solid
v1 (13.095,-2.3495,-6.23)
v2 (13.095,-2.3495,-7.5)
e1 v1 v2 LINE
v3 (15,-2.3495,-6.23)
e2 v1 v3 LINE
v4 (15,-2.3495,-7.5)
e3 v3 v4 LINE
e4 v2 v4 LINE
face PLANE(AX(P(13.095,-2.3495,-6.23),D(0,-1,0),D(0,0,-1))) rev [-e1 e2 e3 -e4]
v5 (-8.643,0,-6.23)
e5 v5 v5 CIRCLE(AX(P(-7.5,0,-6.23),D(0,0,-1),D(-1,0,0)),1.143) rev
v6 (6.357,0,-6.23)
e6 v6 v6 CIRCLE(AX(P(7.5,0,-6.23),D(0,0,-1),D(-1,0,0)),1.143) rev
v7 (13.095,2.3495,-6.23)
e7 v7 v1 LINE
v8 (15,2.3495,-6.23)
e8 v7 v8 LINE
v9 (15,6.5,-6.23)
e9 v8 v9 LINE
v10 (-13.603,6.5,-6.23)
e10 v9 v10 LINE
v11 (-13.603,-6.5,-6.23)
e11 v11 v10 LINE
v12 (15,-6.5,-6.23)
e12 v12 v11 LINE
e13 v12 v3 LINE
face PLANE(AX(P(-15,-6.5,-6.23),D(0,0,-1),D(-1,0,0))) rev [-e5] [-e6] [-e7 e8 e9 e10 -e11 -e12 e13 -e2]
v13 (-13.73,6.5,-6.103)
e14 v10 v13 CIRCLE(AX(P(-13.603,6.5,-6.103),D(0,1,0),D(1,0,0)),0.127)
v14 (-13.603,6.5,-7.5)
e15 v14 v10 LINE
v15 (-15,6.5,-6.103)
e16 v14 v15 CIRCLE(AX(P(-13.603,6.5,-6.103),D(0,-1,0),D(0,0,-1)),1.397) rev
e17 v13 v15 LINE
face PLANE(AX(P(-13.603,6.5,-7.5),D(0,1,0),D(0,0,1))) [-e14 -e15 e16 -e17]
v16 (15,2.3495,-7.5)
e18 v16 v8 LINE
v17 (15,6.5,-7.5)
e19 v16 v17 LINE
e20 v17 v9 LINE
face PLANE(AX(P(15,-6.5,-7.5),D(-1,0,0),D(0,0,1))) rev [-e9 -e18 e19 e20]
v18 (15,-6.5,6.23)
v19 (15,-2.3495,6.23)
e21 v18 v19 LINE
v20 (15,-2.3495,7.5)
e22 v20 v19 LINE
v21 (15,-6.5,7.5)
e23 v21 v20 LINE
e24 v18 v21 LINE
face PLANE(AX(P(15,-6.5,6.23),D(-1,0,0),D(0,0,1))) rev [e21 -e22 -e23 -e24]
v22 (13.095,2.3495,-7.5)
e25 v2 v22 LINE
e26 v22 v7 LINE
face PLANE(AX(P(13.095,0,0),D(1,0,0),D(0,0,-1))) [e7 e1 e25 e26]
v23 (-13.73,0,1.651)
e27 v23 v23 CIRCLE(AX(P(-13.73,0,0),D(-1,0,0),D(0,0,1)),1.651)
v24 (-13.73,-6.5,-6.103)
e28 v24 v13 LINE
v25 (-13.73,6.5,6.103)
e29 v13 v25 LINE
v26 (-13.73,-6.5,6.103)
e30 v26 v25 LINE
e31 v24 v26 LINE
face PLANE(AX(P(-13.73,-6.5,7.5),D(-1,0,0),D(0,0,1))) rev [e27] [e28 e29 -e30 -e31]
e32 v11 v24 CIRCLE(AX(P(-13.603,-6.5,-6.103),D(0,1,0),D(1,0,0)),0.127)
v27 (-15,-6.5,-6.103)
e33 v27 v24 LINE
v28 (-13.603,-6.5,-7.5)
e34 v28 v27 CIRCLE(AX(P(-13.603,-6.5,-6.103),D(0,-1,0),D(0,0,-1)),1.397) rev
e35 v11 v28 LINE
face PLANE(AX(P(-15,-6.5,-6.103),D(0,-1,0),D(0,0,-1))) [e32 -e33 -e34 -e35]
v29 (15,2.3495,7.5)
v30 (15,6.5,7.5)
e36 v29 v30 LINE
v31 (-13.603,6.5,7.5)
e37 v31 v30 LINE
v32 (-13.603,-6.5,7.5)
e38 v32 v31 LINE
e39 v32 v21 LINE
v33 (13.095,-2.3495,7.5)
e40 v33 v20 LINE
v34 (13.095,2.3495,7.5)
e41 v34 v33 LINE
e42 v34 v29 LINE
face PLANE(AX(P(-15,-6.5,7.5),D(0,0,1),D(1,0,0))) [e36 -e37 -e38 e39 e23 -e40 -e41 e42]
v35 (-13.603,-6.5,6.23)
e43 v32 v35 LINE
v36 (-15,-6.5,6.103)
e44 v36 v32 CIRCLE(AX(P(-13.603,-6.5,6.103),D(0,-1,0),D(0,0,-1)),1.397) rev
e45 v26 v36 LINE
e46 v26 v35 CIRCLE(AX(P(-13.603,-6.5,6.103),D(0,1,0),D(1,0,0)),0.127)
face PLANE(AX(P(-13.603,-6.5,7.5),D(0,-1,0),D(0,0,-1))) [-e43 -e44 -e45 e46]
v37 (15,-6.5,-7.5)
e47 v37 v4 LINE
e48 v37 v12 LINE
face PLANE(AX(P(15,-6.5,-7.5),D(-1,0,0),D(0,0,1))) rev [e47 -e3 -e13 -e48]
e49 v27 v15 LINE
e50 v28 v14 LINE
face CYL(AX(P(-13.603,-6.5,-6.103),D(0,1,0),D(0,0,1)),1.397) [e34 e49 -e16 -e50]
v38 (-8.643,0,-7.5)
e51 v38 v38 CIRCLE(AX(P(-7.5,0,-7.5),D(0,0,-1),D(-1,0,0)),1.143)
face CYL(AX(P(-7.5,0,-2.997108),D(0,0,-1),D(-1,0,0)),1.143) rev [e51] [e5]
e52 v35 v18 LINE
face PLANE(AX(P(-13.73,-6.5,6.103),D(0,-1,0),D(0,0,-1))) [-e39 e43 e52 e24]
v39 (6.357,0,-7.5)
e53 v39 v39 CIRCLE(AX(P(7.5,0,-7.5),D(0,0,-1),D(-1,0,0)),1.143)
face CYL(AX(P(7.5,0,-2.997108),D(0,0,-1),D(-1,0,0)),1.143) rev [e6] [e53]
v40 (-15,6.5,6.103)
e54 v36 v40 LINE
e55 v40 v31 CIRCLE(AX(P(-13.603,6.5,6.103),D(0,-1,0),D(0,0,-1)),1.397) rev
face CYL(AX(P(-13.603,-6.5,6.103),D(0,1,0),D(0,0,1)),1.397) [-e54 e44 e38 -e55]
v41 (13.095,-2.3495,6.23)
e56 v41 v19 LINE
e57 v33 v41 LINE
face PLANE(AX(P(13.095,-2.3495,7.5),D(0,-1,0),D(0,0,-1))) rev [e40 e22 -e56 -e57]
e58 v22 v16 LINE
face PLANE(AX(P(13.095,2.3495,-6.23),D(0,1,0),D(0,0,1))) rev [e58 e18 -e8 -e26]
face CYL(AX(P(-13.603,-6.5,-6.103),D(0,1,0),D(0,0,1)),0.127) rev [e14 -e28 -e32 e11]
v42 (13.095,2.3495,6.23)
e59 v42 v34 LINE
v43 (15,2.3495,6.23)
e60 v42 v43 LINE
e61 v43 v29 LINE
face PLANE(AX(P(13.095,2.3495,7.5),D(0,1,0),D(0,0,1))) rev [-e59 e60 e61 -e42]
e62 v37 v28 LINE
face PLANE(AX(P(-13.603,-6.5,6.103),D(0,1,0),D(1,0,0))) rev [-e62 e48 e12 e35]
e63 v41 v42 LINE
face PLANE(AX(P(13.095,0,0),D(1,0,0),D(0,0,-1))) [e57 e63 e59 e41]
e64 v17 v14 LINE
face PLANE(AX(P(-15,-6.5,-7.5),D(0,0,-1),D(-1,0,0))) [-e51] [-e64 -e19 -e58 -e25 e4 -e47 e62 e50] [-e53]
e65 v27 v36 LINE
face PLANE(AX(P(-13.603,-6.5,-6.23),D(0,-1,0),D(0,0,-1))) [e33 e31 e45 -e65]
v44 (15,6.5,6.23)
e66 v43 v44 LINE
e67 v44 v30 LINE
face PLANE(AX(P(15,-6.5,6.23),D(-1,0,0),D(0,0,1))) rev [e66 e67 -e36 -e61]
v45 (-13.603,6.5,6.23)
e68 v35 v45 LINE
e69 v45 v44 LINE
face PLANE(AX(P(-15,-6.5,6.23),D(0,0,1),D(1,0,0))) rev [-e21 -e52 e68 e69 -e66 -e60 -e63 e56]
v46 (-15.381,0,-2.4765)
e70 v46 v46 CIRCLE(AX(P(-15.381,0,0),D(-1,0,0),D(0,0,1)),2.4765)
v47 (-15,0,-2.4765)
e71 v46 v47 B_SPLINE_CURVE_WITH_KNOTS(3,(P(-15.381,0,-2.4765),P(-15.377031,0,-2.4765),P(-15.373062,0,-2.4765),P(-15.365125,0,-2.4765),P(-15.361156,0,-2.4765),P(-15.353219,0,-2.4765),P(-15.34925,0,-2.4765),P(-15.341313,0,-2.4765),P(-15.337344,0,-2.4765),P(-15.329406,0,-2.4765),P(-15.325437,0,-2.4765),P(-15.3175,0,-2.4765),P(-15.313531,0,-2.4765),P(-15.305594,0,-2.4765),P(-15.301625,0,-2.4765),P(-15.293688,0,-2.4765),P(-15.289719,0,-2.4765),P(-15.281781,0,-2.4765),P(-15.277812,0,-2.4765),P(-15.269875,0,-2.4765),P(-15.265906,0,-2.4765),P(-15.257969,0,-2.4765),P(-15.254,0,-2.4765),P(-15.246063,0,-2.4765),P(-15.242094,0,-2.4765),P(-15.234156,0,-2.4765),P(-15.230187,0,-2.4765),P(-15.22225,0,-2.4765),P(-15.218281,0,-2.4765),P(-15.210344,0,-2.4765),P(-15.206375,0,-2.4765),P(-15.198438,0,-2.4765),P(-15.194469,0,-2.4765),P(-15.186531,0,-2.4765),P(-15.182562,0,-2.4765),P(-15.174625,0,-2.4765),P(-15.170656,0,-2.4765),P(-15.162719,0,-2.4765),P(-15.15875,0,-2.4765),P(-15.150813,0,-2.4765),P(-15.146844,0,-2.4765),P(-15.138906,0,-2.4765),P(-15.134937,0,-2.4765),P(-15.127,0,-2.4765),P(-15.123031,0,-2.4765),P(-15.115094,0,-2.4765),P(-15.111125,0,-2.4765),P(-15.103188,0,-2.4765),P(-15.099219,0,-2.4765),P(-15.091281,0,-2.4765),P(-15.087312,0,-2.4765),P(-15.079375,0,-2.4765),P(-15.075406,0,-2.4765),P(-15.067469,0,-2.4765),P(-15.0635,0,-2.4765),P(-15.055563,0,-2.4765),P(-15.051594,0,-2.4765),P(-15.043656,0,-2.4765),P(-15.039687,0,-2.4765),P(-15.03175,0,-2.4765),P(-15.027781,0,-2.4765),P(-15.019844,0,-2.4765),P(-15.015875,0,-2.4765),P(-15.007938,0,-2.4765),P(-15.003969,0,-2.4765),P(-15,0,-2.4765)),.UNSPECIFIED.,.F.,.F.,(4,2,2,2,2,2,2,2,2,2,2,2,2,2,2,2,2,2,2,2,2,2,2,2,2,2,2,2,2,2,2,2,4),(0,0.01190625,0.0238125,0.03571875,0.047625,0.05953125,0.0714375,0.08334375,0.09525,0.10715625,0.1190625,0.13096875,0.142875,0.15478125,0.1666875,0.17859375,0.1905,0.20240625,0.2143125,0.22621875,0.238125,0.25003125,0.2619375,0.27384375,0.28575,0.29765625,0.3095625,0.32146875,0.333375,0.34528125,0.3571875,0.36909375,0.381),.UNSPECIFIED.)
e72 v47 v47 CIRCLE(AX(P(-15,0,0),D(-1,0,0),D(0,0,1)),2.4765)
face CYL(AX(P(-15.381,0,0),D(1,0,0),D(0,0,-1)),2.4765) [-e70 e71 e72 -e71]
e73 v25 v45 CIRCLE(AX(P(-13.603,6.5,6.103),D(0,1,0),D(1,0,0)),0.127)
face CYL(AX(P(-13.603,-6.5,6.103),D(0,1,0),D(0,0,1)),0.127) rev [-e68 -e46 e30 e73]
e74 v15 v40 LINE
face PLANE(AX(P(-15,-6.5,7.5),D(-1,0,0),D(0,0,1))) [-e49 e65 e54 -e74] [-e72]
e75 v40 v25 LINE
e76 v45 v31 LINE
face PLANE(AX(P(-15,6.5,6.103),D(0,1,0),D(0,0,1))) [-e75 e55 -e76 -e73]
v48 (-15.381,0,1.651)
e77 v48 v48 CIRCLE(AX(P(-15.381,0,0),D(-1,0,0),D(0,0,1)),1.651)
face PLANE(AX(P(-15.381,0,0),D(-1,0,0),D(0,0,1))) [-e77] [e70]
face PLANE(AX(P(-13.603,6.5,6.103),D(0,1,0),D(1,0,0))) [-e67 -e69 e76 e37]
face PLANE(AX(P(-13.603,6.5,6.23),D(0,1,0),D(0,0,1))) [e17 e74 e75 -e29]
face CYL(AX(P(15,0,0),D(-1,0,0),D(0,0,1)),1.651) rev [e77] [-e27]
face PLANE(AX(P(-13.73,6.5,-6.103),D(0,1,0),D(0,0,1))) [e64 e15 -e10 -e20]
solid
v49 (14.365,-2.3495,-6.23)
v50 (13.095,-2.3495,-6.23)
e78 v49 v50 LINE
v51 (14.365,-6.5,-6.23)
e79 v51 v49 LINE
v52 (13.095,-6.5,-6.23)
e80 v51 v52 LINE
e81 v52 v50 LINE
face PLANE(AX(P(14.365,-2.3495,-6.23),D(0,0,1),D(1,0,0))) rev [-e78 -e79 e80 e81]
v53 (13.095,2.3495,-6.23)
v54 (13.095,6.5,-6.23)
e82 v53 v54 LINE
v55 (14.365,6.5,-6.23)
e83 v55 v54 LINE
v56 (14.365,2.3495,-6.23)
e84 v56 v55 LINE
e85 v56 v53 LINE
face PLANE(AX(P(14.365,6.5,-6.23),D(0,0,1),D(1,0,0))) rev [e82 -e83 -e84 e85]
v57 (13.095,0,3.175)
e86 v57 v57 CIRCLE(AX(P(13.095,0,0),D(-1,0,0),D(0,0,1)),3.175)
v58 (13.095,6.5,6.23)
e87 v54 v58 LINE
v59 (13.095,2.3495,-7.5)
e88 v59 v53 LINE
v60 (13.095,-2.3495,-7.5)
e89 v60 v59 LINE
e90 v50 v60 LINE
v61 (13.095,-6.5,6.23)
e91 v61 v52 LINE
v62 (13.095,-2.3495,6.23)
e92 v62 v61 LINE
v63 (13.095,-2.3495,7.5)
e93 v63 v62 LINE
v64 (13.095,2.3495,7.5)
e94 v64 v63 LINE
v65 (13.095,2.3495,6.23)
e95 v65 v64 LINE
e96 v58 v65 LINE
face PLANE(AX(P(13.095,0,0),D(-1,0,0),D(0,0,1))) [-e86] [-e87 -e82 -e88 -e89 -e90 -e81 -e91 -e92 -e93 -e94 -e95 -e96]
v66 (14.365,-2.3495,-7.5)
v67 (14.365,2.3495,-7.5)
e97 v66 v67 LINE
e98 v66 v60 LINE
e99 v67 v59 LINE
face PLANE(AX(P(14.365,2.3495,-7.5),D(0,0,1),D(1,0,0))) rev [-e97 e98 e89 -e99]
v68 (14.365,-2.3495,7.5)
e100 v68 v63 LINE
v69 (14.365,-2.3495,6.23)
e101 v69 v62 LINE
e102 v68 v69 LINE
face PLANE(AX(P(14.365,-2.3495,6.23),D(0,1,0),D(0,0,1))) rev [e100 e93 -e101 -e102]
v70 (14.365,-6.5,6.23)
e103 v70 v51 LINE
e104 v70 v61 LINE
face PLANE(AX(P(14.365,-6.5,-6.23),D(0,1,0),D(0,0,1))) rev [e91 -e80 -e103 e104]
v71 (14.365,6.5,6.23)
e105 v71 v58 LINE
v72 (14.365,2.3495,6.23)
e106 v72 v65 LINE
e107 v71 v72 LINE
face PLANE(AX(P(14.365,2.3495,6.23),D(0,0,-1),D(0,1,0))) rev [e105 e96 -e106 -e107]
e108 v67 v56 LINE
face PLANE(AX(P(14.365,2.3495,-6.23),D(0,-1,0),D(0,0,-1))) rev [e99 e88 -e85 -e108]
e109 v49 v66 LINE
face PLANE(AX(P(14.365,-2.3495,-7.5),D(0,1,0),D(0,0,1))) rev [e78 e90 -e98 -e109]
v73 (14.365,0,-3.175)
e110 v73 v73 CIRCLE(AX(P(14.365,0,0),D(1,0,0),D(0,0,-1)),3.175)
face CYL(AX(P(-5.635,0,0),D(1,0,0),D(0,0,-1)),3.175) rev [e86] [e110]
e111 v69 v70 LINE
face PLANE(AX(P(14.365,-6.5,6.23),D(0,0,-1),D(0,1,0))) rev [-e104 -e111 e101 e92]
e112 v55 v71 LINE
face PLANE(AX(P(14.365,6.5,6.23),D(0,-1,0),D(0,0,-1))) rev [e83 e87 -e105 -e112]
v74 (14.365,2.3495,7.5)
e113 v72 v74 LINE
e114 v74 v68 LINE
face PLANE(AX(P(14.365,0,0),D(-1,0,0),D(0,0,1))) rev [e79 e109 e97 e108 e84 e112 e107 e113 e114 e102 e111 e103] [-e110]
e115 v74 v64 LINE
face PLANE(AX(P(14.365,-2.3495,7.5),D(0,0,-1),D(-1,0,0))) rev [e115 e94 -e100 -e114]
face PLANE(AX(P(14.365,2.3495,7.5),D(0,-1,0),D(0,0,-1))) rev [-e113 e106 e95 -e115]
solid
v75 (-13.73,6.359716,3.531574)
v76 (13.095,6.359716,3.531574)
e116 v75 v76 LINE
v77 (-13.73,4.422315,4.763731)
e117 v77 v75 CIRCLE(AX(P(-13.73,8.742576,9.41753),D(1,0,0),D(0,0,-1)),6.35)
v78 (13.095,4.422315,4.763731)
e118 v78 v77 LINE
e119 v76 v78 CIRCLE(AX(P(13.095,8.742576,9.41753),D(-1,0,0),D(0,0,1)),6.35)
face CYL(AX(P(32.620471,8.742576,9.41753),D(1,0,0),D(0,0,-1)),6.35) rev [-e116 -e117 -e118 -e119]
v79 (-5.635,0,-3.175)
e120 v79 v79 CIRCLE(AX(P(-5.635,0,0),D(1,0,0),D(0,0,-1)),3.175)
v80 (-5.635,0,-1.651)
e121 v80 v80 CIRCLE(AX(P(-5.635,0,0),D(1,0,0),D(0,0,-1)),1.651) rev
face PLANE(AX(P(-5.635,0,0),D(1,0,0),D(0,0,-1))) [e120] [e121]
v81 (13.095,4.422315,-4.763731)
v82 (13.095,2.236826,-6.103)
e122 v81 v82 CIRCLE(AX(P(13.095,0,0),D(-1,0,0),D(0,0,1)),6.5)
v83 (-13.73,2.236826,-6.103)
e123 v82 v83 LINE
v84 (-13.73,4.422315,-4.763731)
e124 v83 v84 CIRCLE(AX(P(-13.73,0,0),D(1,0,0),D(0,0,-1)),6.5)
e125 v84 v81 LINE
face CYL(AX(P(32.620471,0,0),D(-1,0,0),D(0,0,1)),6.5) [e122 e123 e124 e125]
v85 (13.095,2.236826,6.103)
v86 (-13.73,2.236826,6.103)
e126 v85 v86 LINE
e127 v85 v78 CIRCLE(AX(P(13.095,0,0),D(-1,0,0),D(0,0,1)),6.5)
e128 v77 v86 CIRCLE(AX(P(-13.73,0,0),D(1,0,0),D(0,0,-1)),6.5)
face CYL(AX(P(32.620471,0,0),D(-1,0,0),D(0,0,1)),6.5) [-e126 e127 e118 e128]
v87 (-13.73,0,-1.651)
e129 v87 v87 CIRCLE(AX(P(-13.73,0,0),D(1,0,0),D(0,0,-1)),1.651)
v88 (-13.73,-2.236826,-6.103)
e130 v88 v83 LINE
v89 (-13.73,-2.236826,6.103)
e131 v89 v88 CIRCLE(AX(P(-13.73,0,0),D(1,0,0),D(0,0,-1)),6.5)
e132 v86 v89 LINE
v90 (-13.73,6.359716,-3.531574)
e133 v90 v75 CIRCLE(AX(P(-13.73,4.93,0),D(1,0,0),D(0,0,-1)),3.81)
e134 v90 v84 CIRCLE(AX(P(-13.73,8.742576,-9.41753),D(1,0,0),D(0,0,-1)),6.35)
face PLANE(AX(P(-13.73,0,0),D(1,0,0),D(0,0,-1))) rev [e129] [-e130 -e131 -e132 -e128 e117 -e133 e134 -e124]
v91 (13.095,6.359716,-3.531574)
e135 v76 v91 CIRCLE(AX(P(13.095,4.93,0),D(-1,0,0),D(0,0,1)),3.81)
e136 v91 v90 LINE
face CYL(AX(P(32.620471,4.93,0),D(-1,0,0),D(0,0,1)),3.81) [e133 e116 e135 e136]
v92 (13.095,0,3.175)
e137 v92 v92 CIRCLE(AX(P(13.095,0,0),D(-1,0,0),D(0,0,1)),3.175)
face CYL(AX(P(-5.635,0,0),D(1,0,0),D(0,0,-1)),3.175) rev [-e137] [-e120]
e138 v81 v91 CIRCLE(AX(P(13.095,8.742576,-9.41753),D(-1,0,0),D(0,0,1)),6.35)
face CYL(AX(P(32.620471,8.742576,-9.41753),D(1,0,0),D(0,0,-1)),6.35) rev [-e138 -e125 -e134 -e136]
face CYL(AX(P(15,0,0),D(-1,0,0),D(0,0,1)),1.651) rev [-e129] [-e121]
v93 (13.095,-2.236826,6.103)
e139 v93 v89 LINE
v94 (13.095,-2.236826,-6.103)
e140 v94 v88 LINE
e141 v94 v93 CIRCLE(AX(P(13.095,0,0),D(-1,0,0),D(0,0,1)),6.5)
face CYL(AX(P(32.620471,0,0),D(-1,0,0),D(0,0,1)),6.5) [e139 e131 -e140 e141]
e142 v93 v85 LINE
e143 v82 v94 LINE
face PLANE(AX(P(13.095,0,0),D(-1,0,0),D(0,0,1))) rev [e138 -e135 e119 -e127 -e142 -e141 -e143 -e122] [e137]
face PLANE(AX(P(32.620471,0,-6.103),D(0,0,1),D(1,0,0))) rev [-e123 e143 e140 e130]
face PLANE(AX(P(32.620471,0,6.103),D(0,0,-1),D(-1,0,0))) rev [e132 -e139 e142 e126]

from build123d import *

# Parameters (mm, degrees)
T_LE_DE_BASE_PLI_E1_DEPTH = 6.5
ESQUISSE6_W               = 1.27
ESQUISSE6_H               = 4.699
ENL_V_MAT_EXTRU_1_DEPTH   = 1.905
BOSS_EXTRU_1_DEPTH        = 1.27
BOSS_EXTRU_2_DEPTH        = 26.825
CONG_1_R                  = 6.35
ESQUISSE13_R              = 1.651
ENL_V_MAT_EXTRU_2_DEPTH   = 33.134679114
BOSS_EXTRU_3_START        = 0.381
ESQUISSE14_R              = 2.4765
ESQUISSE14_R_2            = 1.651
BOSS_EXTRU_3_DEPTH        = 0.381
ESQUISSE15_R              = 3.175
ENL_V_MAT_EXTRU_3_DEPTH   = 20
ESQUISSE19_R              = 1.143
ENL_V_MAT_EXTRU_7_DEPTH   = 1.27


# Read off the part's stored shape, not the designer's step: Boss.-Extru.2
# Sheet-metal steps are written as plain solids
with BuildPart() as part:
    # Esquisse1 → Tôle de base pliée1 (new, symmetric)
    with BuildSketch(Plane(origin=(0, 0, 0), x_dir=(1, 0, 0), z_dir=(0, 1, 0))):
        with BuildLine():
            Line((15, 7.5), (-13.603, 7.5))
            ThreePointArc((-13.603, 7.5), (-14.590828173, 7.090828173), (-15, 6.103))
            Line((-15, 6.103), (-15, -6.103))
            ThreePointArc((-15, -6.103), (-14.590828173, -7.090828173), (-13.603, -7.5))
            Line((-13.603, -7.5), (15, -7.5))
            Line((15, -7.5), (15, -6.23))
            Line((15, -6.23), (-13.603, -6.23))
            ThreePointArc((-13.603, -6.23), (-13.692802561, -6.192802561), (-13.73, -6.103))
            Line((-13.73, -6.103), (-13.73, 6.103))
            ThreePointArc((-13.73, 6.103), (-13.692802561, 6.192802561), (-13.603, 6.23))
            Line((-13.603, 6.23), (15, 6.23))
            Line((15, 6.23), (15, 7.5))
        make_face()
    extrude(amount=T_LE_DE_BASE_PLI_E1_DEPTH, both=True)

    # Esquisse6 → Enlèv. mat.-Extru.1 (cut)
    with BuildSketch(Plane(origin=(15, 0, 0), x_dir=(0, 0, -1), z_dir=(1, 0, 0))):
        with Locations((-6.865, 0)):
            Rectangle(ESQUISSE6_W, ESQUISSE6_H)
        with Locations((6.865, 0)):
            Rectangle(ESQUISSE6_W, ESQUISSE6_H)
    extrude(amount=-ENL_V_MAT_EXTRU_1_DEPTH, mode=Mode.SUBTRACT)


with BuildPart() as body_2:
    # Esquisse7 → Boss.-Extru.1 (new body)
    with BuildSketch(Plane(origin=(13.095, 0, 0), x_dir=(0, 0, -1), z_dir=(1, 0, 0))):
        Polygon((-7.5, 2.3495), (-6.23, 2.3495), (-6.23, 6.5), (6.23, 6.5), (6.23, 2.3495), (7.5, 2.3495), (7.5, -2.3495), (6.23, -2.3495), (6.23, -6.5), (-6.23, -6.5), (-6.23, -2.3495), (-7.5, -2.3495), align=None)
    extrude(amount=BOSS_EXTRU_1_DEPTH)


with BuildPart() as body_3:
    # Boss.-Extru.2 outline → Boss.-Extru.2 (new body)
    with BuildSketch(Plane(origin=(-13.73, 0, 0), x_dir=(0, 0, -1), z_dir=(1, 0, 0))):
        with BuildLine():
            ThreePointArc((6.103, 2.2368261), (5.176867338, 3.93065447), (3.794095002, 5.277768763))
            ThreePointArc((3.794095002, 5.277768763), (0, 8.74), (-3.794095002, 5.277768763))
            ThreePointArc((-3.794095002, 5.277768763), (-5.176867338, 3.93065447), (-6.103, 2.2368261))
            Line((-6.103, 2.2368261), (-6.103, -2.2368261))
            ThreePointArc((-6.103, -2.2368261), (0, -6.5), (6.103, -2.2368261))
            Line((6.103, -2.2368261), (6.103, 2.2368261))
        make_face()
    extrude(amount=BOSS_EXTRU_2_DEPTH)

    # Congé1
    cong_1_edges = [body_3.edges().sort_by_distance(p)[0] for p in [
        (-0.3175, 5.277768763, -3.794095002),
        (-0.3175, 5.277768763, 3.794095002),
    ]]
    fillet(cong_1_edges, radius=CONG_1_R)


with BuildPart() as enl_v_mat_extru_2_tool:
    # Esquisse13 → Enlèv. mat.-Extru.2 (new, through all)
    with BuildSketch(Plane.ZY.offset(15)):
        Circle(ESQUISSE13_R)
    extrude(amount=-ENL_V_MAT_EXTRU_2_DEPTH)


with BuildPart() as part_1:
    add(part.part)

    # Enlèv. mat.-Extru.2: cut by enl_v_mat_extru_2_tool
    add(enl_v_mat_extru_2_tool.part, mode=Mode.SUBTRACT)

    # Esquisse14 → Boss.-Extru.3 (add)
    with BuildSketch(Plane.ZY.offset(15).offset(BOSS_EXTRU_3_START)):
        with Locations(Location((0, 0, 0), (0, 0, 180))):
            Circle(ESQUISSE14_R)
        Circle(ESQUISSE14_R_2, mode=Mode.SUBTRACT)
    extrude(amount=-BOSS_EXTRU_3_DEPTH)

    # Esquisse19 → Enlèv. mat.-Extru.7 (cut)
    with BuildSketch(Plane(origin=(0, 0, -7.5), x_dir=(-1, 0, 0), z_dir=(0, 0, -1))):
        with Locations((-7.5, 0)):
            Circle(ESQUISSE19_R)
        with Locations((7.5, 0)):
            Circle(ESQUISSE19_R)
    extrude(amount=-ENL_V_MAT_EXTRU_7_DEPTH, mode=Mode.SUBTRACT)


with BuildPart() as body_2_1:
    add(body_2.part)

    # Enlèv. mat.-Extru.2: cut by enl_v_mat_extru_2_tool
    add(enl_v_mat_extru_2_tool.part, mode=Mode.SUBTRACT)


with BuildPart() as body_3_1:
    add(body_3.part)

    # Enlèv. mat.-Extru.2: cut by enl_v_mat_extru_2_tool
    add(enl_v_mat_extru_2_tool.part, mode=Mode.SUBTRACT)


with BuildPart() as enl_v_mat_extru_3_tool:
    # Esquisse15 → Enlèv. mat.-Extru.3 (new body)
    with BuildSketch(Plane(origin=(14.365, 0, 0), x_dir=(0, 0, -1), z_dir=(1, 0, 0))):
        Circle(ESQUISSE15_R)
    extrude(amount=-ENL_V_MAT_EXTRU_3_DEPTH)


with BuildPart() as body_2_2:
    add(body_2_1.part)

    # Enlèv. mat.-Extru.3: cut by enl_v_mat_extru_3_tool
    add(enl_v_mat_extru_3_tool.part, mode=Mode.SUBTRACT)


with BuildPart() as body_3_2:
    add(body_3_1.part)

    # Enlèv. mat.-Extru.3: cut by enl_v_mat_extru_3_tool
    add(enl_v_mat_extru_3_tool.part, mode=Mode.SUBTRACT)


solid = Compound([part_1.part, body_2_2.part, body_3_2.part])
